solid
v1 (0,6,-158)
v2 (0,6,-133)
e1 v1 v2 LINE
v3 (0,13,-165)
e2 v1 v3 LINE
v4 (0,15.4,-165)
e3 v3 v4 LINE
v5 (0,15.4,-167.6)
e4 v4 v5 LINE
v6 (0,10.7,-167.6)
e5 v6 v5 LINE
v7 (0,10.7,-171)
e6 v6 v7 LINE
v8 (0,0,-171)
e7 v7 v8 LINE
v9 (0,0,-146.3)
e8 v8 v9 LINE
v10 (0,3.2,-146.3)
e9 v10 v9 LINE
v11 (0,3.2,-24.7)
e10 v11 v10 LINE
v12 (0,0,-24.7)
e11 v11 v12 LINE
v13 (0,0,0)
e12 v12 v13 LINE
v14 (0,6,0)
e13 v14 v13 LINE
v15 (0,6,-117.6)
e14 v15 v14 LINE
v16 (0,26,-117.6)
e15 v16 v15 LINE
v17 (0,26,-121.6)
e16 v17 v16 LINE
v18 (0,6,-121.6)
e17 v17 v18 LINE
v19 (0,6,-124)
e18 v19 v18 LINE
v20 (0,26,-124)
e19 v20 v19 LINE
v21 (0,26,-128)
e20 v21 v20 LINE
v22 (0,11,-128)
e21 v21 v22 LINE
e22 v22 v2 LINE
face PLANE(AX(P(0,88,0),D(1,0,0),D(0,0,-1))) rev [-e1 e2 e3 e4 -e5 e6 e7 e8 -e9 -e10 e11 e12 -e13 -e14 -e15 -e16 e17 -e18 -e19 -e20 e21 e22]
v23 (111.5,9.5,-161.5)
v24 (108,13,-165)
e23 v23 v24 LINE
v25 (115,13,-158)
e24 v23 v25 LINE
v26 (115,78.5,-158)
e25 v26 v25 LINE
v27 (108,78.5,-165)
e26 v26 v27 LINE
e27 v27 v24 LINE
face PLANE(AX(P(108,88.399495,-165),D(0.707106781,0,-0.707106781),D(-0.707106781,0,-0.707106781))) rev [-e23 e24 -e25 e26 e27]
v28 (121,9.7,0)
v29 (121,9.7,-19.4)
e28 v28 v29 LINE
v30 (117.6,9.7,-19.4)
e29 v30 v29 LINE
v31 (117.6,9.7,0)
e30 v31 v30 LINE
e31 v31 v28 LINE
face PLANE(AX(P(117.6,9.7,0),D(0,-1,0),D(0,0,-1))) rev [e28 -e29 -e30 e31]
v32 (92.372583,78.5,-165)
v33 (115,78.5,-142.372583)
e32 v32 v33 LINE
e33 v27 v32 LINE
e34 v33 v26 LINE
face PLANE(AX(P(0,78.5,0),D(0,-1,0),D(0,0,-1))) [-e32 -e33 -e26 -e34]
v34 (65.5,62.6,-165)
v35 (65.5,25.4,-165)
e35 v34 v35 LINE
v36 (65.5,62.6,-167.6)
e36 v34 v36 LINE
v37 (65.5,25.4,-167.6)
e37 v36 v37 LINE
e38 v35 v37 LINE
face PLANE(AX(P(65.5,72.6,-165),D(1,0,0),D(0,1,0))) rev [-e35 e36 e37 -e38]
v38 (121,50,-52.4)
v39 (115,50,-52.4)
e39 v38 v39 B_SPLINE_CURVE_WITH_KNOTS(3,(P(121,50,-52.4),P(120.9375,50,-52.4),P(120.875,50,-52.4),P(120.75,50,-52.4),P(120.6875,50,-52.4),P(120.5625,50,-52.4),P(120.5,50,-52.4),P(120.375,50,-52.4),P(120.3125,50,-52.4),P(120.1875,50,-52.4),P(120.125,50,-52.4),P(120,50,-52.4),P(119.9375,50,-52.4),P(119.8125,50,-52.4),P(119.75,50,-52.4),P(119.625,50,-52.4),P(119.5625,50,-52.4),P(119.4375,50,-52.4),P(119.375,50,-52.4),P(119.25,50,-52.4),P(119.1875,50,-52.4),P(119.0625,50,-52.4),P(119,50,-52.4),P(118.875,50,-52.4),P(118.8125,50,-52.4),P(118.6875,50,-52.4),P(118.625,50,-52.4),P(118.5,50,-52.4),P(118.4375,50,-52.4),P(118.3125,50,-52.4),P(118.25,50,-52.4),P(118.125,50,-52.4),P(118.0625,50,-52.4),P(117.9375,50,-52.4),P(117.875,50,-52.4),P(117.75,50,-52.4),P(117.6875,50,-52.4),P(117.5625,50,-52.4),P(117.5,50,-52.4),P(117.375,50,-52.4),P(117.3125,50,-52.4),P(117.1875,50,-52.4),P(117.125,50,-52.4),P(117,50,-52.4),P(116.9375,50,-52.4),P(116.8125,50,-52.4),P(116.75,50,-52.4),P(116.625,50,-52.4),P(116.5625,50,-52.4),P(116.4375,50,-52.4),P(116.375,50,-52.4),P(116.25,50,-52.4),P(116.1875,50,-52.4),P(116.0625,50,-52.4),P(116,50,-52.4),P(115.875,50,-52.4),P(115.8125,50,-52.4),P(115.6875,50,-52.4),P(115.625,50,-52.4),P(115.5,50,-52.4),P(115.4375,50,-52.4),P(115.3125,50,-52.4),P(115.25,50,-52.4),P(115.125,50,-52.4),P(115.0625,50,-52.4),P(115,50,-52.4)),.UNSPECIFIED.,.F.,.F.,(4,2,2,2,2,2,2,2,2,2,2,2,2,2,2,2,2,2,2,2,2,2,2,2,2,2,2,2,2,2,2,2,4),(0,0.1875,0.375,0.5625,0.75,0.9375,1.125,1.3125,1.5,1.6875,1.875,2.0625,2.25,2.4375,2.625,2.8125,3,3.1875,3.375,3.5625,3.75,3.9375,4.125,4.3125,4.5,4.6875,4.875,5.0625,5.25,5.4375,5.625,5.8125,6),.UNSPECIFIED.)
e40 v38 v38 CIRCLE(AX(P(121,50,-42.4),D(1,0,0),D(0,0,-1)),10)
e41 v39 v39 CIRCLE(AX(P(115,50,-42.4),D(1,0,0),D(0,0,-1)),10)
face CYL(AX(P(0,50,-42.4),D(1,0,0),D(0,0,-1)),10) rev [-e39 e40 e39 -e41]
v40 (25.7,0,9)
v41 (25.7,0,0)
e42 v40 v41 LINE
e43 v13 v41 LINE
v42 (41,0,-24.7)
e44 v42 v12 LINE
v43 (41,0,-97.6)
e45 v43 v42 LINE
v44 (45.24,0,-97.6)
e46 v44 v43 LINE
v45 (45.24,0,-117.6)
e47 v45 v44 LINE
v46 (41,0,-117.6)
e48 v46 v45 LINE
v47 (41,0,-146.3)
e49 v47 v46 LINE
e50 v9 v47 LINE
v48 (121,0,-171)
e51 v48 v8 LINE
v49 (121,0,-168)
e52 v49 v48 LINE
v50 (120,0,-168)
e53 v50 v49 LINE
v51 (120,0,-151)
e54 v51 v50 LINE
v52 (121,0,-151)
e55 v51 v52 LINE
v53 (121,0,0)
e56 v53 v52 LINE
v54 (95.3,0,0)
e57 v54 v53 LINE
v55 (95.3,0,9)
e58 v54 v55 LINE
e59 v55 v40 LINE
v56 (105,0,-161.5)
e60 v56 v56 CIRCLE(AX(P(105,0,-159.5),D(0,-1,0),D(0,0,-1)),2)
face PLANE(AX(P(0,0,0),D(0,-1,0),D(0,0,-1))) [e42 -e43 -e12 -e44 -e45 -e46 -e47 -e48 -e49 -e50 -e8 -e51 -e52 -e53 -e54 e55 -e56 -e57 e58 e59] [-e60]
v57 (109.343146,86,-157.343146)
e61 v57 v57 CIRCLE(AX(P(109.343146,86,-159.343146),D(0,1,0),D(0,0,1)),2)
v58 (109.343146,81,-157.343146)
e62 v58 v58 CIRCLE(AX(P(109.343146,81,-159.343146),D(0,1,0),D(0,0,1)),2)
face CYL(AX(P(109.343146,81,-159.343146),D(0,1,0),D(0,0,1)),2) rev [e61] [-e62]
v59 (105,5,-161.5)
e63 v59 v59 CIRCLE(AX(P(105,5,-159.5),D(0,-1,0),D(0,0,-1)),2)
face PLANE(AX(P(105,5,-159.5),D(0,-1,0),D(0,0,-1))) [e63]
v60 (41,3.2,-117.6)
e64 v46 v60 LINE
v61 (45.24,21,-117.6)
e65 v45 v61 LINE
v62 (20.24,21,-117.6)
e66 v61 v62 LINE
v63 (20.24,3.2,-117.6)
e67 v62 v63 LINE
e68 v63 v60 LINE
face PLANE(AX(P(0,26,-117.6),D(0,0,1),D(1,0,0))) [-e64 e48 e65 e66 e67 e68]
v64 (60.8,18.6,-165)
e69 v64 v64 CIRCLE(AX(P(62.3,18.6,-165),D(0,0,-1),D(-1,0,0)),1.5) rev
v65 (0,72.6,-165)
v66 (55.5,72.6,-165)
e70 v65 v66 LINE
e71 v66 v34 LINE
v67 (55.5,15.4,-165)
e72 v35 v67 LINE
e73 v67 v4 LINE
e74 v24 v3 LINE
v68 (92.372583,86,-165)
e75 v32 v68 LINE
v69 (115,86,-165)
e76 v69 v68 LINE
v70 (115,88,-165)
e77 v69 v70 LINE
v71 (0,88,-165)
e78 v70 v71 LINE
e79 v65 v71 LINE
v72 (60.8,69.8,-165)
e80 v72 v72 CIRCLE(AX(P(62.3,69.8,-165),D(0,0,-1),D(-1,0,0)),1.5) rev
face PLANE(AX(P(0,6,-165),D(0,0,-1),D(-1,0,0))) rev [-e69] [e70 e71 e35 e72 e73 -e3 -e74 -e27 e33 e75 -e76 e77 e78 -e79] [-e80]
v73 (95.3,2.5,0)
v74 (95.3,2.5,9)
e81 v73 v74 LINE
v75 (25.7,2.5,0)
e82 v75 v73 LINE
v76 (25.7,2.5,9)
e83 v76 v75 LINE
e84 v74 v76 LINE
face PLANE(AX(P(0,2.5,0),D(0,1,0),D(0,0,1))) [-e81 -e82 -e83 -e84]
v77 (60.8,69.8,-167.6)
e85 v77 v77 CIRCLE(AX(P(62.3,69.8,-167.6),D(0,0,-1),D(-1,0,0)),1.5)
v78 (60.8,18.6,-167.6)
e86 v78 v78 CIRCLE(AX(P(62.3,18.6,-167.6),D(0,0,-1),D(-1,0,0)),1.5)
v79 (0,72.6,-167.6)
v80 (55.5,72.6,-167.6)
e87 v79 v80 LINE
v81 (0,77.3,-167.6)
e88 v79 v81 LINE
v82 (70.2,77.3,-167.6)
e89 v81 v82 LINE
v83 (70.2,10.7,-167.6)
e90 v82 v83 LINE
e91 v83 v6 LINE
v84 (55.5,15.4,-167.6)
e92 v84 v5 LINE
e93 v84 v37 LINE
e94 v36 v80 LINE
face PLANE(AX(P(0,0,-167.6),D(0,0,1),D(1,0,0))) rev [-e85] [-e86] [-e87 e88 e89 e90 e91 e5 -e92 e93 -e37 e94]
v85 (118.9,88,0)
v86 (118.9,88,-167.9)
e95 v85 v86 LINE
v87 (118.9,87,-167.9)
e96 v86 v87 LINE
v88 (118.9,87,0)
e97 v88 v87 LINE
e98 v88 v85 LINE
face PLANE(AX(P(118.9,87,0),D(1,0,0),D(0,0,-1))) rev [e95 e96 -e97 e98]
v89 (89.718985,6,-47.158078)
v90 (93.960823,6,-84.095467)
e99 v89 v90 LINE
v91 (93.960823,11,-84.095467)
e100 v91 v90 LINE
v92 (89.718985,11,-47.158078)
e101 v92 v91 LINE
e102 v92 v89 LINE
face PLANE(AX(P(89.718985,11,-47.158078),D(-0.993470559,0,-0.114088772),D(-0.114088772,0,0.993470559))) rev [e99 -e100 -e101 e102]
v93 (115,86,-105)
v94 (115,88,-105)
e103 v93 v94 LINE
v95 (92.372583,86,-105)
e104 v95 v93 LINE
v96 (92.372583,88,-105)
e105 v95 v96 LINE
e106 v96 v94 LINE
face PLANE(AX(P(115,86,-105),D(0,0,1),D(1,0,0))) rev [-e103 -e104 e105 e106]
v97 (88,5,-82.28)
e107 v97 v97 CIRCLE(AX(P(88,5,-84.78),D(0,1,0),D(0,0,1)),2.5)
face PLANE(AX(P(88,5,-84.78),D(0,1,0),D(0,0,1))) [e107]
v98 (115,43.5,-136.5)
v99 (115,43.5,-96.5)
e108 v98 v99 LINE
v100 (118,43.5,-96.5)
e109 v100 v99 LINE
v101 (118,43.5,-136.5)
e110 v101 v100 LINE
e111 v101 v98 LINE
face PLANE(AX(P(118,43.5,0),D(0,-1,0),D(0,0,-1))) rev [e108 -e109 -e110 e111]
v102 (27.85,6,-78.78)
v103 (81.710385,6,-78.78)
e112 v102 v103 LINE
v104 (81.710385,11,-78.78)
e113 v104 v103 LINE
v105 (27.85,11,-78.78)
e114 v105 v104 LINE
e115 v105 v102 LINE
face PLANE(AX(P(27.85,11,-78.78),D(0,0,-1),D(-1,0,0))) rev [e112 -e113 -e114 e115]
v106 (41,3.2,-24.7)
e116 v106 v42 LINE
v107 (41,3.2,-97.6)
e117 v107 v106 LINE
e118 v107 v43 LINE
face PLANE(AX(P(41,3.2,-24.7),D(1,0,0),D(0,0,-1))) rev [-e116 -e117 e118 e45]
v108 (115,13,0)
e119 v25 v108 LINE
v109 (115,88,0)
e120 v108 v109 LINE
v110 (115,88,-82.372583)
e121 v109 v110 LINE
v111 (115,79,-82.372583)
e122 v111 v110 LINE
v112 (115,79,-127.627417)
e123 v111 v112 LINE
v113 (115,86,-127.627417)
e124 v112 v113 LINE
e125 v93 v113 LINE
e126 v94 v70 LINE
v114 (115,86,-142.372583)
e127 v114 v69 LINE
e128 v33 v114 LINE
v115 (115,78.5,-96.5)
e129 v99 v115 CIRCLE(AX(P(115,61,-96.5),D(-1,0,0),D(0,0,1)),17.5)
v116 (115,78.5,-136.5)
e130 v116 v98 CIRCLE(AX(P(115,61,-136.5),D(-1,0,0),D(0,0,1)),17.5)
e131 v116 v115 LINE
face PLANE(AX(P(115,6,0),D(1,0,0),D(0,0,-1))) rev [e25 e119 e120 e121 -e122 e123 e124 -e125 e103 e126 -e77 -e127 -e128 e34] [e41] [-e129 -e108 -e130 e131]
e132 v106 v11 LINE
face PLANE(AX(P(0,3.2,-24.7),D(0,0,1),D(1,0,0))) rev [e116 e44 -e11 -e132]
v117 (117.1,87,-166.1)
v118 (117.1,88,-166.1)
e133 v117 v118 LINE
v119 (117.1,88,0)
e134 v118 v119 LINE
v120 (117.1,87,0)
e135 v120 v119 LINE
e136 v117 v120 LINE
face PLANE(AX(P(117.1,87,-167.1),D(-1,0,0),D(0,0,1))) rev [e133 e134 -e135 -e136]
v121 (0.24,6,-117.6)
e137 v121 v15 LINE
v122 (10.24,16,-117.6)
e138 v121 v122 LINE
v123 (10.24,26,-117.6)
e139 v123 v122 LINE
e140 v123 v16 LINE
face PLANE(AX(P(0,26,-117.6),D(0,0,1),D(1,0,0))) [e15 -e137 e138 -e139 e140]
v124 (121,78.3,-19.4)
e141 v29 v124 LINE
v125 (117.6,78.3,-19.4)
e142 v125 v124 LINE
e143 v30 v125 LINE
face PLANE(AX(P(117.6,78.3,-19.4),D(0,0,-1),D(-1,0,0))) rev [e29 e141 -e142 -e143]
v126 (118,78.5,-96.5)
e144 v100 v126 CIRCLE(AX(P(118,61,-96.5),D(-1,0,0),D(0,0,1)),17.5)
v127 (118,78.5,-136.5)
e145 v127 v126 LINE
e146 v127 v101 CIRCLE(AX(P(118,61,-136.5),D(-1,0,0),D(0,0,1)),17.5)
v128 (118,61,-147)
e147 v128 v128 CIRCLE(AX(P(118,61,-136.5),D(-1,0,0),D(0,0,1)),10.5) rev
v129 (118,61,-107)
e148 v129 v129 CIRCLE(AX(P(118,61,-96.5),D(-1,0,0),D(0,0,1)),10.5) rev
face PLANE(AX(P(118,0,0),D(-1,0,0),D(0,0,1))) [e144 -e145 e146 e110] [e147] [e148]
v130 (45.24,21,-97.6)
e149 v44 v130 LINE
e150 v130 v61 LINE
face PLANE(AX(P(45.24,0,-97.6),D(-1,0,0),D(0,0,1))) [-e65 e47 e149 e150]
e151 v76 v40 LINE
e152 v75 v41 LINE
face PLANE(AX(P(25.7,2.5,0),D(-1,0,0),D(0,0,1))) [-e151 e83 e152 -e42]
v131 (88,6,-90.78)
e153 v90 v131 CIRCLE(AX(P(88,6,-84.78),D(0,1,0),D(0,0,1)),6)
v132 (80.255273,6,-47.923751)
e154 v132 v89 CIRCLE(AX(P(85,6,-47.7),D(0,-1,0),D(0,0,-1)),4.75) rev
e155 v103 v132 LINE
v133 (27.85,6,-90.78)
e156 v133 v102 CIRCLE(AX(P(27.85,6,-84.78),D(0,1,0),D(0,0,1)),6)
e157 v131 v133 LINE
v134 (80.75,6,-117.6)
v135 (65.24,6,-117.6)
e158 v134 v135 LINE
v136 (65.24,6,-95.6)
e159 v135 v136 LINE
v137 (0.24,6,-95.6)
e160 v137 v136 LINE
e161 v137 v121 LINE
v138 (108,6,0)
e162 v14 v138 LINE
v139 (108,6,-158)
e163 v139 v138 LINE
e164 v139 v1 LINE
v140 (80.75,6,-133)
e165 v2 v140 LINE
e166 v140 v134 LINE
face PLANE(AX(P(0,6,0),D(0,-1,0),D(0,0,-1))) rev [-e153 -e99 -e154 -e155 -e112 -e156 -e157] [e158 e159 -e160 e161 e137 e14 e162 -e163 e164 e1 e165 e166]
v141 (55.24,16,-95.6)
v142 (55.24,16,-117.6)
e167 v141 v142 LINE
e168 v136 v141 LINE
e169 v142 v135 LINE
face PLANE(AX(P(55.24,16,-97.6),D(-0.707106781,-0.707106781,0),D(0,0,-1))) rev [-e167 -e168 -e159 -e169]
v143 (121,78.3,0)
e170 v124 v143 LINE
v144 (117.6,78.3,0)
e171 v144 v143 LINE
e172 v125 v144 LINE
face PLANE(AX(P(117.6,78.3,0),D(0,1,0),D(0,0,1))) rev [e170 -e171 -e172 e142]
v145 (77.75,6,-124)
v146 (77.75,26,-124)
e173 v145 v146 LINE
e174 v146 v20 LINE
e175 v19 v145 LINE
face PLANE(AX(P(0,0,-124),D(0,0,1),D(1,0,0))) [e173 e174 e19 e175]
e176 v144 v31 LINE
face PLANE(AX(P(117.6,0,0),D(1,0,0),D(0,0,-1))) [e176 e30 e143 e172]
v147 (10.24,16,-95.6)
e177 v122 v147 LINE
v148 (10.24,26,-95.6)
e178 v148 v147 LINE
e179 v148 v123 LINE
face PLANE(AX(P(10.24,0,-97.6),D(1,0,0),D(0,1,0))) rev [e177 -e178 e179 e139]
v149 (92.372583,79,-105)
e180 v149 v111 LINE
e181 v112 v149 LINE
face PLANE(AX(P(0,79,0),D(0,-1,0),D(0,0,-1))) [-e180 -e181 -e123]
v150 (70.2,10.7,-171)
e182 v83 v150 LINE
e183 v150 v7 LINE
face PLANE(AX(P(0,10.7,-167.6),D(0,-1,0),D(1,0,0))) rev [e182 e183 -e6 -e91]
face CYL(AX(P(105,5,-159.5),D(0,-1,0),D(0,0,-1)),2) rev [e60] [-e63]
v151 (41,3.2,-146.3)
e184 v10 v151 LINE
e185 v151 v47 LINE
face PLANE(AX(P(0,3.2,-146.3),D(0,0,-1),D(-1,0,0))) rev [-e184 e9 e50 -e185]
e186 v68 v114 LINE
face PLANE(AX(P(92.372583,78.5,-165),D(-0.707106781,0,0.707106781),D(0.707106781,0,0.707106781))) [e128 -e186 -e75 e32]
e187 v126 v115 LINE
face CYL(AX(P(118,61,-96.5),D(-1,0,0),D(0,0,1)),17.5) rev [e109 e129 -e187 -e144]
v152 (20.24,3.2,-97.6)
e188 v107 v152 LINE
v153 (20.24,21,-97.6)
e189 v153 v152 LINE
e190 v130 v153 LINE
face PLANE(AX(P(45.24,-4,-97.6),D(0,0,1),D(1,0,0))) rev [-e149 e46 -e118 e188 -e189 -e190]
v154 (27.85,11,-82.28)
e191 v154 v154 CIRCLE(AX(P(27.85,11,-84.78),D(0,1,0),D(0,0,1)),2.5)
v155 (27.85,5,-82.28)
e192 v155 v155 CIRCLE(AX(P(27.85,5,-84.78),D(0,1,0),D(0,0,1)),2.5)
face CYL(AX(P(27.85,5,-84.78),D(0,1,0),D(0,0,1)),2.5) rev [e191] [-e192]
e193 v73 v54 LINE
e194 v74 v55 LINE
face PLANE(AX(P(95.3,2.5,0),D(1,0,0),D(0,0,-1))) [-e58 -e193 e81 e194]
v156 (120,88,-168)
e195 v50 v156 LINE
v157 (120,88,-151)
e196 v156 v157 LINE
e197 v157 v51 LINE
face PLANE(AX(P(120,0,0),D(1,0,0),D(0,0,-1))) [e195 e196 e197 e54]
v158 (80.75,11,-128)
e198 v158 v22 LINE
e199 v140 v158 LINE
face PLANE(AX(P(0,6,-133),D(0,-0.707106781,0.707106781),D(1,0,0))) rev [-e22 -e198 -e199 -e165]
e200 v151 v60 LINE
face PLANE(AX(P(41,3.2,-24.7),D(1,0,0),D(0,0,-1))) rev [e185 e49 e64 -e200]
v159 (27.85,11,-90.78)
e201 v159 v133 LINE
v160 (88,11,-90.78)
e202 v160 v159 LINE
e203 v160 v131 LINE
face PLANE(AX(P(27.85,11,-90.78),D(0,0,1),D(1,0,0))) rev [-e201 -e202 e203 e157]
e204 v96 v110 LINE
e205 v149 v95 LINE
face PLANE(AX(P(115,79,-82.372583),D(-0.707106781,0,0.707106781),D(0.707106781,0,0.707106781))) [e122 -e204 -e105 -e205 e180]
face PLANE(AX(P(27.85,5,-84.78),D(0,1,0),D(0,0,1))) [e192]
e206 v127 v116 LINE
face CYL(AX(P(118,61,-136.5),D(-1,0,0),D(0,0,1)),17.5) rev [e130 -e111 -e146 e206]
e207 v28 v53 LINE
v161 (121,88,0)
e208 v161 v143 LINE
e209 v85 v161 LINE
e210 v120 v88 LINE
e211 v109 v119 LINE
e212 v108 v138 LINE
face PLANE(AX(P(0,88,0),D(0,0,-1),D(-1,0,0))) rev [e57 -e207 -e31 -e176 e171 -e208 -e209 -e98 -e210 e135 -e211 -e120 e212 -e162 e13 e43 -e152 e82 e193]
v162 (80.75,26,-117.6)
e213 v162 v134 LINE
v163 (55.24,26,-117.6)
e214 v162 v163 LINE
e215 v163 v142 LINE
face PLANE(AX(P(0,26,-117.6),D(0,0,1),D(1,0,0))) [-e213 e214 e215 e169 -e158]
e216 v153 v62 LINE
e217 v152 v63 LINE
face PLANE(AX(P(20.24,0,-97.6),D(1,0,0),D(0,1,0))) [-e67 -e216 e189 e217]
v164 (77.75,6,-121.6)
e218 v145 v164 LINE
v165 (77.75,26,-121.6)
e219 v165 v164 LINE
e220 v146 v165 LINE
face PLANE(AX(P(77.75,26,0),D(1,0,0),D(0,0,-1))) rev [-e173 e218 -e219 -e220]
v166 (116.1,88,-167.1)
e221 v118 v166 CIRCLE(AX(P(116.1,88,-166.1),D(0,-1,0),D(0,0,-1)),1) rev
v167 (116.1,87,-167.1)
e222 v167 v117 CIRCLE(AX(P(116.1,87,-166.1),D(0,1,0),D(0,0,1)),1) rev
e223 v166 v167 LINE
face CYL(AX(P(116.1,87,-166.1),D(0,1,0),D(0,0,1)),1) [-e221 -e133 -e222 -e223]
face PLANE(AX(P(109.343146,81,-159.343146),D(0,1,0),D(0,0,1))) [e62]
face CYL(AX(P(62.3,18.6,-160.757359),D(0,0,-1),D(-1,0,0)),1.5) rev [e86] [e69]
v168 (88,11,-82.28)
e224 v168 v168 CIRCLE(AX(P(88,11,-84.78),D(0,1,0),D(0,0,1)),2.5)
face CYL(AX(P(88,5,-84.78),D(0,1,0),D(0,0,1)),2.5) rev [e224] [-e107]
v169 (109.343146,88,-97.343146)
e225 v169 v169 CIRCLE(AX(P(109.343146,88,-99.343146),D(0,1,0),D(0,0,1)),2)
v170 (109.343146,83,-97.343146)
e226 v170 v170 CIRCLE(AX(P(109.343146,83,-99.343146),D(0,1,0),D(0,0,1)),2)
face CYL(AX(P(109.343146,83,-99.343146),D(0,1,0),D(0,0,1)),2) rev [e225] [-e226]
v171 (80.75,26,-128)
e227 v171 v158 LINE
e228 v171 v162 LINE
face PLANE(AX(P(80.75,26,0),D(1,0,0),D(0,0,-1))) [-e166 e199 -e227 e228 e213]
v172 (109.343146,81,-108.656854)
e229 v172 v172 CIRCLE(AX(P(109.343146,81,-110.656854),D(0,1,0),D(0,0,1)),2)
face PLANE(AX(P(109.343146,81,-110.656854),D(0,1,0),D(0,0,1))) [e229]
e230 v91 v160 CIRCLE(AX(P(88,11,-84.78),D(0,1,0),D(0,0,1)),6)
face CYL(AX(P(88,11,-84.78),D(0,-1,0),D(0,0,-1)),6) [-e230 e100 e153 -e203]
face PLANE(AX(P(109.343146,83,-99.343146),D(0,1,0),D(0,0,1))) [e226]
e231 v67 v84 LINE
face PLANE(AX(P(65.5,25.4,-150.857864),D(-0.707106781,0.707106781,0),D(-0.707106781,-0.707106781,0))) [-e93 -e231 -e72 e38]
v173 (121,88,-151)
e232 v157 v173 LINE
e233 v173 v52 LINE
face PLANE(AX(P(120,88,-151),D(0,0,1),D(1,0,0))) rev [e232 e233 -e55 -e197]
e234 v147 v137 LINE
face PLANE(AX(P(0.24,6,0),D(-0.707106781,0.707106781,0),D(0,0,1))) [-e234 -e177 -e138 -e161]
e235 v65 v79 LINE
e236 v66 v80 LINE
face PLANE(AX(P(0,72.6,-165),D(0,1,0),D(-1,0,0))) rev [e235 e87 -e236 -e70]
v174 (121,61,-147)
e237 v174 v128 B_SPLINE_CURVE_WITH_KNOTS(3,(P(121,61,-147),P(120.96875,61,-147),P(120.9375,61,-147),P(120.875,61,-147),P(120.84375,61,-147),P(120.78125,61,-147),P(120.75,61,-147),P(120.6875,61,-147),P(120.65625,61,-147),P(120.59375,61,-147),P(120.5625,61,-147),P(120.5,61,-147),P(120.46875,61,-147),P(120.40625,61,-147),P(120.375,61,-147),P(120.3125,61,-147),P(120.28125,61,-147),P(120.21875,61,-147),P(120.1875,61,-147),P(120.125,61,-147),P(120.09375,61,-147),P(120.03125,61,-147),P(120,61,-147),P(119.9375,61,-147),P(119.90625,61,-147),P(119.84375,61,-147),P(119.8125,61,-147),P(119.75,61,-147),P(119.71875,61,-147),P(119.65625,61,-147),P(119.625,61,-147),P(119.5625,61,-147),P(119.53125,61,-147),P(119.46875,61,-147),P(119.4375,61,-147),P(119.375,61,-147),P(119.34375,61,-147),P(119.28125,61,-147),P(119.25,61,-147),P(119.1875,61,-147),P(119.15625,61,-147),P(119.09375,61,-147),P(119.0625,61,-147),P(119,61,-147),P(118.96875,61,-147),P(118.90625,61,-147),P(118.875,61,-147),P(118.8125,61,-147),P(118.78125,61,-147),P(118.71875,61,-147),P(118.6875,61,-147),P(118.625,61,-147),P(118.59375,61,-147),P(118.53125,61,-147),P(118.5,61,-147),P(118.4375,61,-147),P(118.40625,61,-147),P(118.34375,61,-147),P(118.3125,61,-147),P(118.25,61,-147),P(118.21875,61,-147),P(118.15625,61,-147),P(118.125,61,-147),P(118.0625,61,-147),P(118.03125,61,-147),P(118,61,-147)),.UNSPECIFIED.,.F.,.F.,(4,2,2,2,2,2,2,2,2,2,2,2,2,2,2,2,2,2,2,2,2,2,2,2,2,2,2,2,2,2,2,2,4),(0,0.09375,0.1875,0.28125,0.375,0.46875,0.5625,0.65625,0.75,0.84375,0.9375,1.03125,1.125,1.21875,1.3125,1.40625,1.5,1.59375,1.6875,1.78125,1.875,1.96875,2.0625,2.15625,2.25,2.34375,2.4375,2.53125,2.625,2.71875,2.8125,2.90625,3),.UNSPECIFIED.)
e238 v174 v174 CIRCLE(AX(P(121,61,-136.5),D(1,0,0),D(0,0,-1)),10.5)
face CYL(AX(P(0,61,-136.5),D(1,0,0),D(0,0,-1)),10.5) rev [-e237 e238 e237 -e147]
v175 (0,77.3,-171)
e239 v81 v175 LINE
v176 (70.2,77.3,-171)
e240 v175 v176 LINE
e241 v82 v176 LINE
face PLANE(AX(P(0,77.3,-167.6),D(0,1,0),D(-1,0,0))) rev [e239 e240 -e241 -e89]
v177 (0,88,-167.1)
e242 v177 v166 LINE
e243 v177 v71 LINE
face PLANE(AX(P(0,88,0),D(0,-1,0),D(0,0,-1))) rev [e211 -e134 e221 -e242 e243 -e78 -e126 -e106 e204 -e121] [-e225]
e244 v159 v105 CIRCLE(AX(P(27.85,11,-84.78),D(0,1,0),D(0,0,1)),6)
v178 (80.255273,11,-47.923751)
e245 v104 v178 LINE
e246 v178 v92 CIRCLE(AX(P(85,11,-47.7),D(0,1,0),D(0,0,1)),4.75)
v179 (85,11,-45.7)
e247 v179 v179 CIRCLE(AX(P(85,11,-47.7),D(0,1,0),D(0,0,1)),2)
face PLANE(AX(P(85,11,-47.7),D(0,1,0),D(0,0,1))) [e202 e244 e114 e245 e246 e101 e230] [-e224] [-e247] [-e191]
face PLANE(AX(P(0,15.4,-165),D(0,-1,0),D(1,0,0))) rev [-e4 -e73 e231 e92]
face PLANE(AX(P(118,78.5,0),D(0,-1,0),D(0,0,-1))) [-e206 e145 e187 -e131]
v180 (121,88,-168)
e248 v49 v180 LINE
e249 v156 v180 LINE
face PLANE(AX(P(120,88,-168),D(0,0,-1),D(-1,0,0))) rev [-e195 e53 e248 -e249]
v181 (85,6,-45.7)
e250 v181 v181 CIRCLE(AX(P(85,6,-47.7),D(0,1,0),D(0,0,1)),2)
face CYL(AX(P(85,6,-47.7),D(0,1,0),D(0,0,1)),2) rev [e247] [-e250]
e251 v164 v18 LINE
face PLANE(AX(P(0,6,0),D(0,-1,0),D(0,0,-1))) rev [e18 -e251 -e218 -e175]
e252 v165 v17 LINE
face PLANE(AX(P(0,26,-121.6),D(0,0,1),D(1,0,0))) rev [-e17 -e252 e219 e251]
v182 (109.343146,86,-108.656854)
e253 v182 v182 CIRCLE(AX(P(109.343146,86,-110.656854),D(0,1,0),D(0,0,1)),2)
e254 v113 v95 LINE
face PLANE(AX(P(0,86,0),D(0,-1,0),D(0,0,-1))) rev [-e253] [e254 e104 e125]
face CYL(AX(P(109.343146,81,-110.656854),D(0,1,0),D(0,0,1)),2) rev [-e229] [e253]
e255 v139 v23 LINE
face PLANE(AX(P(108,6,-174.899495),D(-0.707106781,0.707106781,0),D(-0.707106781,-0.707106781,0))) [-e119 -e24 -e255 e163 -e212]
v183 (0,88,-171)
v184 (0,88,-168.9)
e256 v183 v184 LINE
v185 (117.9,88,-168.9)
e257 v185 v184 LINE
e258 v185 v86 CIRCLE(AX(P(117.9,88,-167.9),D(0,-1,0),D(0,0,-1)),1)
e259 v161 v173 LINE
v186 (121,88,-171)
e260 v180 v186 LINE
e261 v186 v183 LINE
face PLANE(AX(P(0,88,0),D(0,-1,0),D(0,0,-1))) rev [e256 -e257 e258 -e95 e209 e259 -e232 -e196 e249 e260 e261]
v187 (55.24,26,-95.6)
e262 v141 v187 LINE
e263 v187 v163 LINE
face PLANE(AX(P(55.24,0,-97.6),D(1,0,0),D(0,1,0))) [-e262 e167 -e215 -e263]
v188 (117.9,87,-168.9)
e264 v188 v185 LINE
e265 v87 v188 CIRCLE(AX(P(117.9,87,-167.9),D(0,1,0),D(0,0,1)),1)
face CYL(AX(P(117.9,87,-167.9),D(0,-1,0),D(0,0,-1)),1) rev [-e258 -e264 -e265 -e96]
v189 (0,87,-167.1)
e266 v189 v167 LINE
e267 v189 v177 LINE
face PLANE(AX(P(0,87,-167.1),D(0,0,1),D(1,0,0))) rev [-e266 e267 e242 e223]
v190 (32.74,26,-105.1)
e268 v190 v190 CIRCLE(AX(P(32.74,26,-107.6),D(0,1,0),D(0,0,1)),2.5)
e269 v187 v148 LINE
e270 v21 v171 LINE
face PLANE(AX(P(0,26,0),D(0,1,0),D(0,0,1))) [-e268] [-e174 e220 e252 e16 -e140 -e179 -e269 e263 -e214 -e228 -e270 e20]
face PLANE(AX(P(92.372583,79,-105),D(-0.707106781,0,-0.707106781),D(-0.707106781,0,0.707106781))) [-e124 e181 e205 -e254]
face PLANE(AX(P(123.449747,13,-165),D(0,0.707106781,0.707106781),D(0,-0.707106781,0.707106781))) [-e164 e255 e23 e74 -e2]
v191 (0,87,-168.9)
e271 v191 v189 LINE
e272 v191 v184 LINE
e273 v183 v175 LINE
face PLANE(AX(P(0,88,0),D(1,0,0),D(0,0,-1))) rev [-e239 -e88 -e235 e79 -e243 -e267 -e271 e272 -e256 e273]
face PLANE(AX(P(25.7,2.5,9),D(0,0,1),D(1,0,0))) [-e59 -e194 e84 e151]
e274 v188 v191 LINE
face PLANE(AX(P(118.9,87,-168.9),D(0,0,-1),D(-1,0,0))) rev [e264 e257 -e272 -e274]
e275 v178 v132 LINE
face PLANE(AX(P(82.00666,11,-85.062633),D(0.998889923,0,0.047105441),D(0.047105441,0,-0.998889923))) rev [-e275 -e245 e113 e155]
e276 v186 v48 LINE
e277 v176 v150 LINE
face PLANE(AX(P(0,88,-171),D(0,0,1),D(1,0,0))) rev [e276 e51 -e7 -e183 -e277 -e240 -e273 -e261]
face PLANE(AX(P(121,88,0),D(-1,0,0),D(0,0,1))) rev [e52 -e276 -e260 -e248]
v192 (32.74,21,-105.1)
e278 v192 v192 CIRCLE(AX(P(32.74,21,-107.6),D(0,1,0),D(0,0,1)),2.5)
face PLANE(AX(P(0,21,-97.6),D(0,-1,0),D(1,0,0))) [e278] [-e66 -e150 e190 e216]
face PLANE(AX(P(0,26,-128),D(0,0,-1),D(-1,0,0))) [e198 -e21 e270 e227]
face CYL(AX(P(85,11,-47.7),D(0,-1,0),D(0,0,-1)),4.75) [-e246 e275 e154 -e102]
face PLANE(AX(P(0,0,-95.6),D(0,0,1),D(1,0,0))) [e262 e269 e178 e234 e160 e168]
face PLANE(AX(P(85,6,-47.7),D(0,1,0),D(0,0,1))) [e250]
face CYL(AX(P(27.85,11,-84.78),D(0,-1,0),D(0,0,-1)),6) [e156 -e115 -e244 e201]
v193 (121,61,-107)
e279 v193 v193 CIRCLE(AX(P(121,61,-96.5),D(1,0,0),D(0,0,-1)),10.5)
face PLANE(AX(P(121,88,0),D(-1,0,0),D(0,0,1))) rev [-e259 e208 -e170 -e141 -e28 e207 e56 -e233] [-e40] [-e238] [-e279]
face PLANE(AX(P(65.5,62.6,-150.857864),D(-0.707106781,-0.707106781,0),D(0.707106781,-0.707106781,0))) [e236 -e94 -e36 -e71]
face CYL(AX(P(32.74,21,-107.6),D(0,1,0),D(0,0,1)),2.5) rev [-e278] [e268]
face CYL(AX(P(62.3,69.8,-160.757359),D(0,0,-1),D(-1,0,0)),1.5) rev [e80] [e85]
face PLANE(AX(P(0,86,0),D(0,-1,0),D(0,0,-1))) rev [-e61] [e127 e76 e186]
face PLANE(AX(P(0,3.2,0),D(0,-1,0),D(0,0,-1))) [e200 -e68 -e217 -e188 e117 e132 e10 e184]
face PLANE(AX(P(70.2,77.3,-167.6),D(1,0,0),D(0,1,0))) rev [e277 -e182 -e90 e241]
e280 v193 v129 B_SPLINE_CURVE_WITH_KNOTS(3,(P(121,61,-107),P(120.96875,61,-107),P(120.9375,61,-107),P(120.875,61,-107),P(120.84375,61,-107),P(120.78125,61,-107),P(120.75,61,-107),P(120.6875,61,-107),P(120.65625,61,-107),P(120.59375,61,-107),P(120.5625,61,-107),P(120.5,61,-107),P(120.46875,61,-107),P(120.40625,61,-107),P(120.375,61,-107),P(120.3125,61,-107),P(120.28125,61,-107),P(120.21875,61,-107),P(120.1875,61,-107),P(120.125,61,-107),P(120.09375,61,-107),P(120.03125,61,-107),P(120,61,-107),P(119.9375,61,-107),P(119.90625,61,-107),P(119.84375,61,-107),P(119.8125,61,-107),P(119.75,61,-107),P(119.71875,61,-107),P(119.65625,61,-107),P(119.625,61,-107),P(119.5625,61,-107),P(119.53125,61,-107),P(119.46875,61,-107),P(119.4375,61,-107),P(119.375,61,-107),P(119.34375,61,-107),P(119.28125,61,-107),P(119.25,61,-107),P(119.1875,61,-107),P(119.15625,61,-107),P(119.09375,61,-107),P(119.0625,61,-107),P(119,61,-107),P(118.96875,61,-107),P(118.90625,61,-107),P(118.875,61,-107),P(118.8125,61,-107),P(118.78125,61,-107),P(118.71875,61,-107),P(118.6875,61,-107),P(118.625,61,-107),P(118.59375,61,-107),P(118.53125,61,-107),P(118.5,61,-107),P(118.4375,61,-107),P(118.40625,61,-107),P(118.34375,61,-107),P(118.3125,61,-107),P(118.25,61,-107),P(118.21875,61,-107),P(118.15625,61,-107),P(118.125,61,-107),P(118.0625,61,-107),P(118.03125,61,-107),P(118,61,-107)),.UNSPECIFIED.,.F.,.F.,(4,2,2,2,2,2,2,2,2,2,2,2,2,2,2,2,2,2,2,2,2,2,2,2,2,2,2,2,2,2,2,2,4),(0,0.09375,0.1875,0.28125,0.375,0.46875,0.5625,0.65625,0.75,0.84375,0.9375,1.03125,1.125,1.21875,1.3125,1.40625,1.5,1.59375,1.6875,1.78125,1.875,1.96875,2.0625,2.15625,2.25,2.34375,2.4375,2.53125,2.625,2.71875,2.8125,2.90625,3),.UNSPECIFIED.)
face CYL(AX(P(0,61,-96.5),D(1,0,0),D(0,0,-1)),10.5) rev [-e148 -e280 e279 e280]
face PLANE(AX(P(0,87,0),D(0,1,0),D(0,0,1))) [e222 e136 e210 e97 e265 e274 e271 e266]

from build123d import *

# Parameters (mm, degrees)
SKETCH2_W               = 121
SKETCH2_H               = 171
BOSS_EXTRUDE1_DEPTH     = 88
SKETCH4_W               = 115
SKETCH4_H               = 165
CUT_EXTRUDE1_DEPTH      = 82
SKETCH5_W               = 41
SKETCH5_H               = 121.6
CUT_EXTRUDE2_DEPTH      = 3.2
SKETCH6_W               = 69.6
SKETCH6_H               = 9
BOSS_EXTRUDE2_DEPTH     = 2.5
SKETCH7_W               = 19.4
SKETCH7_H               = 68.6
CUT_EXTRUDE3_DEPTH      = 3.4
SKETCH9_W               = 70.2
SKETCH9_H               = 66.6
CUT_EXTRUDE4_DEPTH      = 3.4
SKETCH10_W              = 65.5
SKETCH10_H              = 57.2
CUT_EXTRUDE5_DEPTH      = 2.6
SKETCH11_R              = 10.5
SKETCH11_R_2            = 10
CUT_EXTRUDE6_DEPTH      = 228.213555934
BOSS_EXTRUDE4_DEPTH     = 7.5
BOSS_EXTRUDE5_DEPTH     = 9
CUT_EXTRUDE10_DEPTH     = 2
BOSS_EXTRUDE6_DEPTH     = 72.5
SKETCH18_R              = 2
CUT_EXTRUDE11_DEPTH     = 5
SKETCH19_R              = 2
CUT_EXTRUDE12_DEPTH     = 5
SKETCH20_R              = 4.75
BOSS_EXTRUDE7_DEPTH     = 5
SKETCH21_R              = 2
CUT_EXTRUDE13_DEPTH     = 5
SKETCH22_R              = 2.5
CUT_EXTRUDE14_DEPTH     = 6
BOSS_EXTRUDE17_REACH    = 229.214
BOSS_EXTRUDE18_REACH    = 229.214
BOSS_EXTRUDE19_DEPTH    = 5
BOSS_EXTRUDE20_DEPTH    = 20
BOSS_EXTRUDE22_DEPTH    = 20
CHAMFER1_SIZE           = 10
CHAMFER2_SIZE           = 10
SKETCH38_R              = 2.5
CUT_EXTRUDE15_DEPTH     = 5
CHAMFER3_SIZE           = 5
CUT_EXTRUDE16_START     = -3
CUT_EXTRUDE16_OUTLINE_R = 10.5
CUT_EXTRUDE16_DEPTH     = 3
CUT_EXTRUDE17_DEPTH     = 1
SKETCH42_W              = 17
SKETCH42_H              = 88
CUT_EXTRUDE18_DEPTH     = 1
SKETCH44_W              = 77.75
SKETCH44_H              = 20
BOSS_EXTRUDE25_DEPTH    = 1
BOSS_EXTRUDE26_DEPTH    = 2.6
SKETCH46_R              = 1.5
CUT_EXTRUDE19_DEPTH     = 2.6
FILLET1_R               = 1
SKETCH48_W              = 25
SKETCH48_H              = 20
CUT_EXTRUDE21_DEPTH     = 10
BOSS_EXTRUDE27_DEPTH    = 2
SKETCH50_R              = 2
CUT_EXTRUDE22_DEPTH     = 5


# Read off the part's stored shape, not the designer's step: Cut-Extrude16
with BuildPart() as part:
    # Sketch2 → Boss-Extrude1 (new body)
    with BuildSketch(Plane(origin=(0, 0, 0), x_dir=(1, 0, 0), z_dir=(0, 1, 0))):
        with Locations((60.5, 85.5)):
            Rectangle(SKETCH2_W, SKETCH2_H)
    extrude(amount=BOSS_EXTRUDE1_DEPTH)

    # Sketch4 → Cut-Extrude1 (cut)
    with BuildSketch(Plane(origin=(0, 88, 0), x_dir=(1, 0, 0), z_dir=(0, 1, 0))):
        with Locations((57.5, 82.5)):
            Rectangle(SKETCH4_W, SKETCH4_H)
    extrude(amount=-CUT_EXTRUDE1_DEPTH, mode=Mode.SUBTRACT)

    # Sketch5 → Cut-Extrude2 (cut)
    with BuildSketch(Plane.XZ):
        with Locations((20.5, -85.5)):
            Rectangle(SKETCH5_W, SKETCH5_H)
    extrude(amount=-CUT_EXTRUDE2_DEPTH, mode=Mode.SUBTRACT)

    # Sketch6 → Boss-Extrude2 (add)
    with BuildSketch(Plane.XZ):
        with Locations((60.5, 4.5)):
            Rectangle(SKETCH6_W, SKETCH6_H)
    extrude(amount=-BOSS_EXTRUDE2_DEPTH)

    # Sketch7 → Cut-Extrude3 (cut)
    with BuildSketch(Plane(origin=(121, 0, 0), x_dir=(0, 0, -1), z_dir=(1, 0, 0))):
        with Locations((9.7, 44)):
            Rectangle(SKETCH7_W, SKETCH7_H)
    extrude(amount=-CUT_EXTRUDE3_DEPTH, mode=Mode.SUBTRACT)

    # Sketch9 → Cut-Extrude4 (cut)
    with BuildSketch(Plane(origin=(0, 0, -171), x_dir=(-1, 0, 0), z_dir=(0, 0, -1))):
        with Locations((-35.1, 44)):
            Rectangle(SKETCH9_W, SKETCH9_H)
    extrude(amount=-CUT_EXTRUDE4_DEPTH, mode=Mode.SUBTRACT)

    # Sketch10 → Cut-Extrude5 (cut)
    with BuildSketch(Plane(origin=(0, 0, -167.6), x_dir=(-1, 0, 0), z_dir=(0, 0, -1))):
        with Locations((-32.75, 44)):
            Rectangle(SKETCH10_W, SKETCH10_H)
    extrude(amount=-CUT_EXTRUDE5_DEPTH, mode=Mode.SUBTRACT)

    # Sketch11 → Cut-Extrude6 (cut, through all)
    with BuildSketch(Plane(origin=(121, 0, 0), x_dir=(0, 0, -1), z_dir=(1, 0, 0))):
        with Locations((136.5, 61)):
            Circle(SKETCH11_R)
        with Locations((96.5, 61)):
            Circle(SKETCH11_R)
        with Locations((42.4, 50)):
            Circle(SKETCH11_R_2)
    extrude(amount=-CUT_EXTRUDE6_DEPTH, mode=Mode.SUBTRACT)

    # Sketch14 → Boss-Extrude4 (add)
    with BuildSketch(Plane(origin=(0, 86, 0), x_dir=(1, 0, 0), z_dir=(0, 1, 0))):
        Polygon((115, 142.372583002), (115, 165), (92.372583002, 165), align=None)
    extrude(amount=-BOSS_EXTRUDE4_DEPTH)

    # Sketch15 → Boss-Extrude5 (add)
    with BuildSketch(Plane(origin=(0, 88, 0), x_dir=(1, 0, 0), z_dir=(0, 1, 0))):
        Polygon((115, 105), (115, 82.372583002), (92.372583002, 105), (115, 127.627416998), align=None)
    extrude(amount=-BOSS_EXTRUDE5_DEPTH)

    # Sketch16 → Cut-Extrude10 (cut)
    with BuildSketch(Plane(origin=(0, 88, 0), x_dir=(1, 0, 0), z_dir=(0, 1, 0))):
        Polygon((115, 127.627416998), (115, 105), (92.372583002, 105), align=None)
    extrude(amount=-CUT_EXTRUDE10_DEPTH, mode=Mode.SUBTRACT)

    # Sketch17 → Boss-Extrude6 (add)
    with BuildSketch(Plane(origin=(0, 6, 0), x_dir=(1, 0, 0), z_dir=(0, 1, 0))):
        Polygon((115, 165), (108, 165), (115, 158), align=None)
    extrude(amount=BOSS_EXTRUDE6_DEPTH)

    # Sketch18 → Cut-Extrude11 (cut)
    with BuildSketch(Plane(origin=(0, 86, 0), x_dir=(1, 0, 0), z_dir=(0, 1, 0))):
        with Locations(Location((109.343145751, 159.343145751, 0), (0, 0, 270))):
            Circle(SKETCH18_R)
        with Locations(Location((109.343145751, 110.656854249, 0), (0, 0, 270))):
            Circle(SKETCH18_R)
    extrude(amount=-CUT_EXTRUDE11_DEPTH, mode=Mode.SUBTRACT)

    # Sketch19 → Cut-Extrude12 (cut)
    with BuildSketch(Plane(origin=(0, 88, 0), x_dir=(1, 0, 0), z_dir=(0, 1, 0))):
        with Locations(Location((109.343145751, 99.343145751, 0), (0, 0, 270))):
            Circle(SKETCH19_R)
    extrude(amount=-CUT_EXTRUDE12_DEPTH, mode=Mode.SUBTRACT)

    # Sketch20 → Boss-Extrude7 (add)
    with BuildSketch(Plane(origin=(0, 6, 0), x_dir=(1, 0, 0), z_dir=(0, 1, 0))):
        with Locations(Location((85, 47.7, 0), (0, 0, 90))):
            Circle(SKETCH20_R)
        with BuildLine():
            Line((27.85, 78.78), (88, 78.78))
            ThreePointArc((88, 78.78), (94, 84.78), (88, 90.78))
            Line((88, 90.78), (27.85, 90.78))
            ThreePointArc((27.85, 90.78), (21.85, 84.78), (27.85, 78.78))
        make_face()
    extrude(amount=BOSS_EXTRUDE7_DEPTH)

    # Sketch21 → Cut-Extrude13 (cut)
    with BuildSketch(Plane(origin=(0, 11, 0), x_dir=(1, 0, 0), z_dir=(0, 1, 0))):
        with Locations(Location((85, 47.7, 0), (0, 0, 270))):
            Circle(SKETCH21_R)
    extrude(amount=-CUT_EXTRUDE13_DEPTH, mode=Mode.SUBTRACT)

    # Sketch22 → Cut-Extrude14 (cut)
    with BuildSketch(Plane(origin=(0, 11, 0), x_dir=(1, 0, 0), z_dir=(0, 1, 0))):
        with Locations(Location((88, 84.78, 0), (0, 0, 270))):
            Circle(SKETCH22_R)
        with Locations(Location((27.85, 84.78, 0), (0, 0, 270))):
            Circle(SKETCH22_R)
    extrude(amount=-CUT_EXTRUDE14_DEPTH, mode=Mode.SUBTRACT)

    # Boss-Extrude17: up to this plane
    boss_extrude17_end = Plane(origin=(108, 88.399494937, -165), z_dir=(0.7071067811865476, 0, -0.7071067811865476))
    # Sketch33 → Boss-Extrude17 (add, up to the surface)
    with BuildSketch(Plane.XY, mode=Mode.PRIVATE) as boss_extrude17_sk1:
        Polygon((108, 6), (115, 13), (115, 6), align=None)
    boss_extrude17_tool1 = split(extrude(boss_extrude17_sk1.sketch, amount=-BOSS_EXTRUDE17_REACH, mode=Mode.PRIVATE), bisect_by=boss_extrude17_end, keep=Keep.BOTH, mode=Mode.PRIVATE)
    add(boss_extrude17_tool1.solids().sort_by_distance((112.666667, 8.333333, 0))[0])

    # Boss-Extrude18: up to this plane
    boss_extrude18_end = Plane(origin=(108, 88.399494937, -165), z_dir=(0.7071067811865476, 0, -0.7071067811865476))
    # Sketch34 → Boss-Extrude18 (add, up to the surface)
    with BuildSketch(Plane.ZY, mode=Mode.PRIVATE) as boss_extrude18_sk1:
        Polygon((-165, 6), (-165, 13), (-158, 6), align=None)
    boss_extrude18_tool1 = split(extrude(boss_extrude18_sk1.sketch, amount=-BOSS_EXTRUDE18_REACH, mode=Mode.PRIVATE), bisect_by=boss_extrude18_end, keep=Keep.BOTH, mode=Mode.PRIVATE)
    add(boss_extrude18_tool1.solids().sort_by_distance((0, 8.333333, -162.666667))[0])

    # Sketch35 → Boss-Extrude19 (add)
    with BuildSketch(Plane(origin=(0, 6, 0), x_dir=(1, 0, 0), z_dir=(0, 1, 0))):
        with BuildLine():
            Line((82.006660465, 85.062632648), (80.255272868, 47.923750847))
            ThreePointArc((80.255272868, 47.923750847), (85.383052558, 52.434529622), (89.718985156, 47.158078331))
            Line((89.718985156, 47.158078331), (93.960823355, 84.095467366))
            ThreePointArc((93.960823355, 84.095467366), (87.516144137, 78.799541531), (82.006660465, 85.062632648))
        make_face()
    extrude(amount=BOSS_EXTRUDE19_DEPTH)

    # Sketch36 → Boss-Extrude20 (add)
    with BuildSketch(Plane(origin=(0, 6, 0), x_dir=(1, 0, 0), z_dir=(0, 1, 0))):
        Polygon((80.75, 128), (0, 128), (0, 125), (77.75, 125), (77.75, 121.6), (0, 121.6), (0, 117.6), (80.75, 117.6), align=None)
    extrude(amount=BOSS_EXTRUDE20_DEPTH)

    # Sketch37 → Boss-Extrude22 (add)
    with BuildSketch(Plane.XY.offset(-117.6)):
        Polygon((55.24, 26), (10.24, 26), (10.24, 6), (20.24, 6), (20.24, 21), (45.24, 21), (45.24, 6), (55.24, 6), align=None)
    extrude(amount=BOSS_EXTRUDE22_DEPTH)

    # Chamfer1
    chamfer1_edges = [part.edges().sort_by_distance(p)[0] for p in [
        (10.24, 6, -107.6),
    ]]
    chamfer(chamfer1_edges, length=CHAMFER1_SIZE)

    # Chamfer2
    chamfer2_edges = [part.edges().sort_by_distance(p)[0] for p in [
        (55.24, 6, -107.6),
    ]]
    chamfer(chamfer2_edges, length=CHAMFER2_SIZE)

    # Sketch38 → Cut-Extrude15 (cut)
    with BuildSketch(Plane(origin=(0, 26, 0), x_dir=(1, 0, 0), z_dir=(0, 1, 0))):
        with Locations(Location((32.74, 107.6, 0), (0, 0, 270))):
            Circle(SKETCH38_R)
    extrude(amount=-CUT_EXTRUDE15_DEPTH, mode=Mode.SUBTRACT)

    # Chamfer3
    chamfer3_edges = [part.edges().sort_by_distance(p)[0] for p in [
        (40.375, 6, -128),
    ]]
    chamfer(chamfer3_edges, length=CHAMFER3_SIZE)

    # Cut-Extrude16 outline → Cut-Extrude16 (cut)
    with BuildSketch(Plane.ZY.offset(-115).offset(CUT_EXTRUDE16_START)):
        with BuildLine():
            Line((-96.5, 78.5), (-136.5, 78.5))
            ThreePointArc((-136.5, 78.5), (-154, 61), (-136.5, 43.5))
            Line((-136.5, 43.5), (-96.5, 43.5))
            ThreePointArc((-96.5, 43.5), (-79, 61), (-96.5, 78.5))
        make_face()
        with Locations((-136.5, 61)):
            Circle(CUT_EXTRUDE16_OUTLINE_R, mode=Mode.SUBTRACT)
        with Locations((-96.5, 61)):
            Circle(CUT_EXTRUDE16_OUTLINE_R, mode=Mode.SUBTRACT)
    extrude(amount=CUT_EXTRUDE16_DEPTH, mode=Mode.SUBTRACT)

    # Sketch40 → Cut-Extrude17 (cut)
    with BuildSketch(Plane(origin=(0, 88, 0), x_dir=(1, 0, 0), z_dir=(0, 1, 0))):
        Polygon((117.1, 0), (118.9, 0), (118.9, 168.9), (0, 168.9), (0, 167.1), (117.1, 167.1), align=None)
    extrude(amount=-CUT_EXTRUDE17_DEPTH, mode=Mode.SUBTRACT)

    # Sketch42 → Cut-Extrude18 (cut)
    with BuildSketch(Plane(origin=(121, 0, 0), x_dir=(0, 0, -1), z_dir=(1, 0, 0))):
        with Locations((159.5, 44)):
            Rectangle(SKETCH42_W, SKETCH42_H)
    extrude(amount=-CUT_EXTRUDE18_DEPTH, mode=Mode.SUBTRACT)

    # Sketch44 → Boss-Extrude25 (add)
    with BuildSketch(Plane.XY.offset(-125)):
        with Locations((38.875, 16)):
            Rectangle(SKETCH44_W, SKETCH44_H)
    extrude(amount=BOSS_EXTRUDE25_DEPTH)

    # Sketch45 → Boss-Extrude26 (add)
    with BuildSketch(Plane(origin=(0, 0, -167.6), x_dir=(-1, 0, 0), z_dir=(0, 0, -1))):
        Polygon((-65.5, 72.6), (-65.5, 62.6), (-55.5, 72.6), align=None)
        Polygon((-65.5, 15.4), (-65.5, 25.4), (-55.5, 15.4), align=None)
    extrude(amount=-BOSS_EXTRUDE26_DEPTH)

    # Sketch46 → Cut-Extrude19 (cut)
    with BuildSketch(Plane(origin=(0, 0, -167.6), x_dir=(-1, 0, 0), z_dir=(0, 0, -1))):
        with Locations((-62.3, 18.6)):
            Circle(SKETCH46_R)
        with Locations((-62.3, 69.8)):
            Circle(SKETCH46_R)
    extrude(amount=-CUT_EXTRUDE19_DEPTH, mode=Mode.SUBTRACT)

    # Fillet1
    fillet1_edges = [part.edges().sort_by_distance(p)[0] for p in [
        (117.1, 87.5, -167.1),
        (118.9, 87.5, -168.9),
    ]]
    fillet(fillet1_edges, radius=FILLET1_R)

    # Sketch48 → Cut-Extrude21 (cut)
    with BuildSketch(Plane(origin=(0, 6, 0), x_dir=(1, 0, 0), z_dir=(0, 1, 0))):
        with Locations((32.74, 107.6)):
            Rectangle(SKETCH48_W, SKETCH48_H)
    extrude(amount=-CUT_EXTRUDE21_DEPTH, mode=Mode.SUBTRACT)

    # Sketch49 → Boss-Extrude27 (add)
    with BuildSketch(Plane.XY.offset(-97.6)):
        Polygon((10.24, 16), (0.24, 6), (20.24, 6), (45.24, 6), (65.24, 6), (55.24, 16), (55.24, 26), (10.24, 26), align=None)
    extrude(amount=BOSS_EXTRUDE27_DEPTH)

    # Sketch50 → Cut-Extrude22 (cut)
    with BuildSketch(Plane.XZ):
        with Locations(Location((105, -159.5, 0), (0, 0, 270))):
            Circle(SKETCH50_R)
    extrude(amount=-CUT_EXTRUDE22_DEPTH, mode=Mode.SUBTRACT)


solid = part.part
